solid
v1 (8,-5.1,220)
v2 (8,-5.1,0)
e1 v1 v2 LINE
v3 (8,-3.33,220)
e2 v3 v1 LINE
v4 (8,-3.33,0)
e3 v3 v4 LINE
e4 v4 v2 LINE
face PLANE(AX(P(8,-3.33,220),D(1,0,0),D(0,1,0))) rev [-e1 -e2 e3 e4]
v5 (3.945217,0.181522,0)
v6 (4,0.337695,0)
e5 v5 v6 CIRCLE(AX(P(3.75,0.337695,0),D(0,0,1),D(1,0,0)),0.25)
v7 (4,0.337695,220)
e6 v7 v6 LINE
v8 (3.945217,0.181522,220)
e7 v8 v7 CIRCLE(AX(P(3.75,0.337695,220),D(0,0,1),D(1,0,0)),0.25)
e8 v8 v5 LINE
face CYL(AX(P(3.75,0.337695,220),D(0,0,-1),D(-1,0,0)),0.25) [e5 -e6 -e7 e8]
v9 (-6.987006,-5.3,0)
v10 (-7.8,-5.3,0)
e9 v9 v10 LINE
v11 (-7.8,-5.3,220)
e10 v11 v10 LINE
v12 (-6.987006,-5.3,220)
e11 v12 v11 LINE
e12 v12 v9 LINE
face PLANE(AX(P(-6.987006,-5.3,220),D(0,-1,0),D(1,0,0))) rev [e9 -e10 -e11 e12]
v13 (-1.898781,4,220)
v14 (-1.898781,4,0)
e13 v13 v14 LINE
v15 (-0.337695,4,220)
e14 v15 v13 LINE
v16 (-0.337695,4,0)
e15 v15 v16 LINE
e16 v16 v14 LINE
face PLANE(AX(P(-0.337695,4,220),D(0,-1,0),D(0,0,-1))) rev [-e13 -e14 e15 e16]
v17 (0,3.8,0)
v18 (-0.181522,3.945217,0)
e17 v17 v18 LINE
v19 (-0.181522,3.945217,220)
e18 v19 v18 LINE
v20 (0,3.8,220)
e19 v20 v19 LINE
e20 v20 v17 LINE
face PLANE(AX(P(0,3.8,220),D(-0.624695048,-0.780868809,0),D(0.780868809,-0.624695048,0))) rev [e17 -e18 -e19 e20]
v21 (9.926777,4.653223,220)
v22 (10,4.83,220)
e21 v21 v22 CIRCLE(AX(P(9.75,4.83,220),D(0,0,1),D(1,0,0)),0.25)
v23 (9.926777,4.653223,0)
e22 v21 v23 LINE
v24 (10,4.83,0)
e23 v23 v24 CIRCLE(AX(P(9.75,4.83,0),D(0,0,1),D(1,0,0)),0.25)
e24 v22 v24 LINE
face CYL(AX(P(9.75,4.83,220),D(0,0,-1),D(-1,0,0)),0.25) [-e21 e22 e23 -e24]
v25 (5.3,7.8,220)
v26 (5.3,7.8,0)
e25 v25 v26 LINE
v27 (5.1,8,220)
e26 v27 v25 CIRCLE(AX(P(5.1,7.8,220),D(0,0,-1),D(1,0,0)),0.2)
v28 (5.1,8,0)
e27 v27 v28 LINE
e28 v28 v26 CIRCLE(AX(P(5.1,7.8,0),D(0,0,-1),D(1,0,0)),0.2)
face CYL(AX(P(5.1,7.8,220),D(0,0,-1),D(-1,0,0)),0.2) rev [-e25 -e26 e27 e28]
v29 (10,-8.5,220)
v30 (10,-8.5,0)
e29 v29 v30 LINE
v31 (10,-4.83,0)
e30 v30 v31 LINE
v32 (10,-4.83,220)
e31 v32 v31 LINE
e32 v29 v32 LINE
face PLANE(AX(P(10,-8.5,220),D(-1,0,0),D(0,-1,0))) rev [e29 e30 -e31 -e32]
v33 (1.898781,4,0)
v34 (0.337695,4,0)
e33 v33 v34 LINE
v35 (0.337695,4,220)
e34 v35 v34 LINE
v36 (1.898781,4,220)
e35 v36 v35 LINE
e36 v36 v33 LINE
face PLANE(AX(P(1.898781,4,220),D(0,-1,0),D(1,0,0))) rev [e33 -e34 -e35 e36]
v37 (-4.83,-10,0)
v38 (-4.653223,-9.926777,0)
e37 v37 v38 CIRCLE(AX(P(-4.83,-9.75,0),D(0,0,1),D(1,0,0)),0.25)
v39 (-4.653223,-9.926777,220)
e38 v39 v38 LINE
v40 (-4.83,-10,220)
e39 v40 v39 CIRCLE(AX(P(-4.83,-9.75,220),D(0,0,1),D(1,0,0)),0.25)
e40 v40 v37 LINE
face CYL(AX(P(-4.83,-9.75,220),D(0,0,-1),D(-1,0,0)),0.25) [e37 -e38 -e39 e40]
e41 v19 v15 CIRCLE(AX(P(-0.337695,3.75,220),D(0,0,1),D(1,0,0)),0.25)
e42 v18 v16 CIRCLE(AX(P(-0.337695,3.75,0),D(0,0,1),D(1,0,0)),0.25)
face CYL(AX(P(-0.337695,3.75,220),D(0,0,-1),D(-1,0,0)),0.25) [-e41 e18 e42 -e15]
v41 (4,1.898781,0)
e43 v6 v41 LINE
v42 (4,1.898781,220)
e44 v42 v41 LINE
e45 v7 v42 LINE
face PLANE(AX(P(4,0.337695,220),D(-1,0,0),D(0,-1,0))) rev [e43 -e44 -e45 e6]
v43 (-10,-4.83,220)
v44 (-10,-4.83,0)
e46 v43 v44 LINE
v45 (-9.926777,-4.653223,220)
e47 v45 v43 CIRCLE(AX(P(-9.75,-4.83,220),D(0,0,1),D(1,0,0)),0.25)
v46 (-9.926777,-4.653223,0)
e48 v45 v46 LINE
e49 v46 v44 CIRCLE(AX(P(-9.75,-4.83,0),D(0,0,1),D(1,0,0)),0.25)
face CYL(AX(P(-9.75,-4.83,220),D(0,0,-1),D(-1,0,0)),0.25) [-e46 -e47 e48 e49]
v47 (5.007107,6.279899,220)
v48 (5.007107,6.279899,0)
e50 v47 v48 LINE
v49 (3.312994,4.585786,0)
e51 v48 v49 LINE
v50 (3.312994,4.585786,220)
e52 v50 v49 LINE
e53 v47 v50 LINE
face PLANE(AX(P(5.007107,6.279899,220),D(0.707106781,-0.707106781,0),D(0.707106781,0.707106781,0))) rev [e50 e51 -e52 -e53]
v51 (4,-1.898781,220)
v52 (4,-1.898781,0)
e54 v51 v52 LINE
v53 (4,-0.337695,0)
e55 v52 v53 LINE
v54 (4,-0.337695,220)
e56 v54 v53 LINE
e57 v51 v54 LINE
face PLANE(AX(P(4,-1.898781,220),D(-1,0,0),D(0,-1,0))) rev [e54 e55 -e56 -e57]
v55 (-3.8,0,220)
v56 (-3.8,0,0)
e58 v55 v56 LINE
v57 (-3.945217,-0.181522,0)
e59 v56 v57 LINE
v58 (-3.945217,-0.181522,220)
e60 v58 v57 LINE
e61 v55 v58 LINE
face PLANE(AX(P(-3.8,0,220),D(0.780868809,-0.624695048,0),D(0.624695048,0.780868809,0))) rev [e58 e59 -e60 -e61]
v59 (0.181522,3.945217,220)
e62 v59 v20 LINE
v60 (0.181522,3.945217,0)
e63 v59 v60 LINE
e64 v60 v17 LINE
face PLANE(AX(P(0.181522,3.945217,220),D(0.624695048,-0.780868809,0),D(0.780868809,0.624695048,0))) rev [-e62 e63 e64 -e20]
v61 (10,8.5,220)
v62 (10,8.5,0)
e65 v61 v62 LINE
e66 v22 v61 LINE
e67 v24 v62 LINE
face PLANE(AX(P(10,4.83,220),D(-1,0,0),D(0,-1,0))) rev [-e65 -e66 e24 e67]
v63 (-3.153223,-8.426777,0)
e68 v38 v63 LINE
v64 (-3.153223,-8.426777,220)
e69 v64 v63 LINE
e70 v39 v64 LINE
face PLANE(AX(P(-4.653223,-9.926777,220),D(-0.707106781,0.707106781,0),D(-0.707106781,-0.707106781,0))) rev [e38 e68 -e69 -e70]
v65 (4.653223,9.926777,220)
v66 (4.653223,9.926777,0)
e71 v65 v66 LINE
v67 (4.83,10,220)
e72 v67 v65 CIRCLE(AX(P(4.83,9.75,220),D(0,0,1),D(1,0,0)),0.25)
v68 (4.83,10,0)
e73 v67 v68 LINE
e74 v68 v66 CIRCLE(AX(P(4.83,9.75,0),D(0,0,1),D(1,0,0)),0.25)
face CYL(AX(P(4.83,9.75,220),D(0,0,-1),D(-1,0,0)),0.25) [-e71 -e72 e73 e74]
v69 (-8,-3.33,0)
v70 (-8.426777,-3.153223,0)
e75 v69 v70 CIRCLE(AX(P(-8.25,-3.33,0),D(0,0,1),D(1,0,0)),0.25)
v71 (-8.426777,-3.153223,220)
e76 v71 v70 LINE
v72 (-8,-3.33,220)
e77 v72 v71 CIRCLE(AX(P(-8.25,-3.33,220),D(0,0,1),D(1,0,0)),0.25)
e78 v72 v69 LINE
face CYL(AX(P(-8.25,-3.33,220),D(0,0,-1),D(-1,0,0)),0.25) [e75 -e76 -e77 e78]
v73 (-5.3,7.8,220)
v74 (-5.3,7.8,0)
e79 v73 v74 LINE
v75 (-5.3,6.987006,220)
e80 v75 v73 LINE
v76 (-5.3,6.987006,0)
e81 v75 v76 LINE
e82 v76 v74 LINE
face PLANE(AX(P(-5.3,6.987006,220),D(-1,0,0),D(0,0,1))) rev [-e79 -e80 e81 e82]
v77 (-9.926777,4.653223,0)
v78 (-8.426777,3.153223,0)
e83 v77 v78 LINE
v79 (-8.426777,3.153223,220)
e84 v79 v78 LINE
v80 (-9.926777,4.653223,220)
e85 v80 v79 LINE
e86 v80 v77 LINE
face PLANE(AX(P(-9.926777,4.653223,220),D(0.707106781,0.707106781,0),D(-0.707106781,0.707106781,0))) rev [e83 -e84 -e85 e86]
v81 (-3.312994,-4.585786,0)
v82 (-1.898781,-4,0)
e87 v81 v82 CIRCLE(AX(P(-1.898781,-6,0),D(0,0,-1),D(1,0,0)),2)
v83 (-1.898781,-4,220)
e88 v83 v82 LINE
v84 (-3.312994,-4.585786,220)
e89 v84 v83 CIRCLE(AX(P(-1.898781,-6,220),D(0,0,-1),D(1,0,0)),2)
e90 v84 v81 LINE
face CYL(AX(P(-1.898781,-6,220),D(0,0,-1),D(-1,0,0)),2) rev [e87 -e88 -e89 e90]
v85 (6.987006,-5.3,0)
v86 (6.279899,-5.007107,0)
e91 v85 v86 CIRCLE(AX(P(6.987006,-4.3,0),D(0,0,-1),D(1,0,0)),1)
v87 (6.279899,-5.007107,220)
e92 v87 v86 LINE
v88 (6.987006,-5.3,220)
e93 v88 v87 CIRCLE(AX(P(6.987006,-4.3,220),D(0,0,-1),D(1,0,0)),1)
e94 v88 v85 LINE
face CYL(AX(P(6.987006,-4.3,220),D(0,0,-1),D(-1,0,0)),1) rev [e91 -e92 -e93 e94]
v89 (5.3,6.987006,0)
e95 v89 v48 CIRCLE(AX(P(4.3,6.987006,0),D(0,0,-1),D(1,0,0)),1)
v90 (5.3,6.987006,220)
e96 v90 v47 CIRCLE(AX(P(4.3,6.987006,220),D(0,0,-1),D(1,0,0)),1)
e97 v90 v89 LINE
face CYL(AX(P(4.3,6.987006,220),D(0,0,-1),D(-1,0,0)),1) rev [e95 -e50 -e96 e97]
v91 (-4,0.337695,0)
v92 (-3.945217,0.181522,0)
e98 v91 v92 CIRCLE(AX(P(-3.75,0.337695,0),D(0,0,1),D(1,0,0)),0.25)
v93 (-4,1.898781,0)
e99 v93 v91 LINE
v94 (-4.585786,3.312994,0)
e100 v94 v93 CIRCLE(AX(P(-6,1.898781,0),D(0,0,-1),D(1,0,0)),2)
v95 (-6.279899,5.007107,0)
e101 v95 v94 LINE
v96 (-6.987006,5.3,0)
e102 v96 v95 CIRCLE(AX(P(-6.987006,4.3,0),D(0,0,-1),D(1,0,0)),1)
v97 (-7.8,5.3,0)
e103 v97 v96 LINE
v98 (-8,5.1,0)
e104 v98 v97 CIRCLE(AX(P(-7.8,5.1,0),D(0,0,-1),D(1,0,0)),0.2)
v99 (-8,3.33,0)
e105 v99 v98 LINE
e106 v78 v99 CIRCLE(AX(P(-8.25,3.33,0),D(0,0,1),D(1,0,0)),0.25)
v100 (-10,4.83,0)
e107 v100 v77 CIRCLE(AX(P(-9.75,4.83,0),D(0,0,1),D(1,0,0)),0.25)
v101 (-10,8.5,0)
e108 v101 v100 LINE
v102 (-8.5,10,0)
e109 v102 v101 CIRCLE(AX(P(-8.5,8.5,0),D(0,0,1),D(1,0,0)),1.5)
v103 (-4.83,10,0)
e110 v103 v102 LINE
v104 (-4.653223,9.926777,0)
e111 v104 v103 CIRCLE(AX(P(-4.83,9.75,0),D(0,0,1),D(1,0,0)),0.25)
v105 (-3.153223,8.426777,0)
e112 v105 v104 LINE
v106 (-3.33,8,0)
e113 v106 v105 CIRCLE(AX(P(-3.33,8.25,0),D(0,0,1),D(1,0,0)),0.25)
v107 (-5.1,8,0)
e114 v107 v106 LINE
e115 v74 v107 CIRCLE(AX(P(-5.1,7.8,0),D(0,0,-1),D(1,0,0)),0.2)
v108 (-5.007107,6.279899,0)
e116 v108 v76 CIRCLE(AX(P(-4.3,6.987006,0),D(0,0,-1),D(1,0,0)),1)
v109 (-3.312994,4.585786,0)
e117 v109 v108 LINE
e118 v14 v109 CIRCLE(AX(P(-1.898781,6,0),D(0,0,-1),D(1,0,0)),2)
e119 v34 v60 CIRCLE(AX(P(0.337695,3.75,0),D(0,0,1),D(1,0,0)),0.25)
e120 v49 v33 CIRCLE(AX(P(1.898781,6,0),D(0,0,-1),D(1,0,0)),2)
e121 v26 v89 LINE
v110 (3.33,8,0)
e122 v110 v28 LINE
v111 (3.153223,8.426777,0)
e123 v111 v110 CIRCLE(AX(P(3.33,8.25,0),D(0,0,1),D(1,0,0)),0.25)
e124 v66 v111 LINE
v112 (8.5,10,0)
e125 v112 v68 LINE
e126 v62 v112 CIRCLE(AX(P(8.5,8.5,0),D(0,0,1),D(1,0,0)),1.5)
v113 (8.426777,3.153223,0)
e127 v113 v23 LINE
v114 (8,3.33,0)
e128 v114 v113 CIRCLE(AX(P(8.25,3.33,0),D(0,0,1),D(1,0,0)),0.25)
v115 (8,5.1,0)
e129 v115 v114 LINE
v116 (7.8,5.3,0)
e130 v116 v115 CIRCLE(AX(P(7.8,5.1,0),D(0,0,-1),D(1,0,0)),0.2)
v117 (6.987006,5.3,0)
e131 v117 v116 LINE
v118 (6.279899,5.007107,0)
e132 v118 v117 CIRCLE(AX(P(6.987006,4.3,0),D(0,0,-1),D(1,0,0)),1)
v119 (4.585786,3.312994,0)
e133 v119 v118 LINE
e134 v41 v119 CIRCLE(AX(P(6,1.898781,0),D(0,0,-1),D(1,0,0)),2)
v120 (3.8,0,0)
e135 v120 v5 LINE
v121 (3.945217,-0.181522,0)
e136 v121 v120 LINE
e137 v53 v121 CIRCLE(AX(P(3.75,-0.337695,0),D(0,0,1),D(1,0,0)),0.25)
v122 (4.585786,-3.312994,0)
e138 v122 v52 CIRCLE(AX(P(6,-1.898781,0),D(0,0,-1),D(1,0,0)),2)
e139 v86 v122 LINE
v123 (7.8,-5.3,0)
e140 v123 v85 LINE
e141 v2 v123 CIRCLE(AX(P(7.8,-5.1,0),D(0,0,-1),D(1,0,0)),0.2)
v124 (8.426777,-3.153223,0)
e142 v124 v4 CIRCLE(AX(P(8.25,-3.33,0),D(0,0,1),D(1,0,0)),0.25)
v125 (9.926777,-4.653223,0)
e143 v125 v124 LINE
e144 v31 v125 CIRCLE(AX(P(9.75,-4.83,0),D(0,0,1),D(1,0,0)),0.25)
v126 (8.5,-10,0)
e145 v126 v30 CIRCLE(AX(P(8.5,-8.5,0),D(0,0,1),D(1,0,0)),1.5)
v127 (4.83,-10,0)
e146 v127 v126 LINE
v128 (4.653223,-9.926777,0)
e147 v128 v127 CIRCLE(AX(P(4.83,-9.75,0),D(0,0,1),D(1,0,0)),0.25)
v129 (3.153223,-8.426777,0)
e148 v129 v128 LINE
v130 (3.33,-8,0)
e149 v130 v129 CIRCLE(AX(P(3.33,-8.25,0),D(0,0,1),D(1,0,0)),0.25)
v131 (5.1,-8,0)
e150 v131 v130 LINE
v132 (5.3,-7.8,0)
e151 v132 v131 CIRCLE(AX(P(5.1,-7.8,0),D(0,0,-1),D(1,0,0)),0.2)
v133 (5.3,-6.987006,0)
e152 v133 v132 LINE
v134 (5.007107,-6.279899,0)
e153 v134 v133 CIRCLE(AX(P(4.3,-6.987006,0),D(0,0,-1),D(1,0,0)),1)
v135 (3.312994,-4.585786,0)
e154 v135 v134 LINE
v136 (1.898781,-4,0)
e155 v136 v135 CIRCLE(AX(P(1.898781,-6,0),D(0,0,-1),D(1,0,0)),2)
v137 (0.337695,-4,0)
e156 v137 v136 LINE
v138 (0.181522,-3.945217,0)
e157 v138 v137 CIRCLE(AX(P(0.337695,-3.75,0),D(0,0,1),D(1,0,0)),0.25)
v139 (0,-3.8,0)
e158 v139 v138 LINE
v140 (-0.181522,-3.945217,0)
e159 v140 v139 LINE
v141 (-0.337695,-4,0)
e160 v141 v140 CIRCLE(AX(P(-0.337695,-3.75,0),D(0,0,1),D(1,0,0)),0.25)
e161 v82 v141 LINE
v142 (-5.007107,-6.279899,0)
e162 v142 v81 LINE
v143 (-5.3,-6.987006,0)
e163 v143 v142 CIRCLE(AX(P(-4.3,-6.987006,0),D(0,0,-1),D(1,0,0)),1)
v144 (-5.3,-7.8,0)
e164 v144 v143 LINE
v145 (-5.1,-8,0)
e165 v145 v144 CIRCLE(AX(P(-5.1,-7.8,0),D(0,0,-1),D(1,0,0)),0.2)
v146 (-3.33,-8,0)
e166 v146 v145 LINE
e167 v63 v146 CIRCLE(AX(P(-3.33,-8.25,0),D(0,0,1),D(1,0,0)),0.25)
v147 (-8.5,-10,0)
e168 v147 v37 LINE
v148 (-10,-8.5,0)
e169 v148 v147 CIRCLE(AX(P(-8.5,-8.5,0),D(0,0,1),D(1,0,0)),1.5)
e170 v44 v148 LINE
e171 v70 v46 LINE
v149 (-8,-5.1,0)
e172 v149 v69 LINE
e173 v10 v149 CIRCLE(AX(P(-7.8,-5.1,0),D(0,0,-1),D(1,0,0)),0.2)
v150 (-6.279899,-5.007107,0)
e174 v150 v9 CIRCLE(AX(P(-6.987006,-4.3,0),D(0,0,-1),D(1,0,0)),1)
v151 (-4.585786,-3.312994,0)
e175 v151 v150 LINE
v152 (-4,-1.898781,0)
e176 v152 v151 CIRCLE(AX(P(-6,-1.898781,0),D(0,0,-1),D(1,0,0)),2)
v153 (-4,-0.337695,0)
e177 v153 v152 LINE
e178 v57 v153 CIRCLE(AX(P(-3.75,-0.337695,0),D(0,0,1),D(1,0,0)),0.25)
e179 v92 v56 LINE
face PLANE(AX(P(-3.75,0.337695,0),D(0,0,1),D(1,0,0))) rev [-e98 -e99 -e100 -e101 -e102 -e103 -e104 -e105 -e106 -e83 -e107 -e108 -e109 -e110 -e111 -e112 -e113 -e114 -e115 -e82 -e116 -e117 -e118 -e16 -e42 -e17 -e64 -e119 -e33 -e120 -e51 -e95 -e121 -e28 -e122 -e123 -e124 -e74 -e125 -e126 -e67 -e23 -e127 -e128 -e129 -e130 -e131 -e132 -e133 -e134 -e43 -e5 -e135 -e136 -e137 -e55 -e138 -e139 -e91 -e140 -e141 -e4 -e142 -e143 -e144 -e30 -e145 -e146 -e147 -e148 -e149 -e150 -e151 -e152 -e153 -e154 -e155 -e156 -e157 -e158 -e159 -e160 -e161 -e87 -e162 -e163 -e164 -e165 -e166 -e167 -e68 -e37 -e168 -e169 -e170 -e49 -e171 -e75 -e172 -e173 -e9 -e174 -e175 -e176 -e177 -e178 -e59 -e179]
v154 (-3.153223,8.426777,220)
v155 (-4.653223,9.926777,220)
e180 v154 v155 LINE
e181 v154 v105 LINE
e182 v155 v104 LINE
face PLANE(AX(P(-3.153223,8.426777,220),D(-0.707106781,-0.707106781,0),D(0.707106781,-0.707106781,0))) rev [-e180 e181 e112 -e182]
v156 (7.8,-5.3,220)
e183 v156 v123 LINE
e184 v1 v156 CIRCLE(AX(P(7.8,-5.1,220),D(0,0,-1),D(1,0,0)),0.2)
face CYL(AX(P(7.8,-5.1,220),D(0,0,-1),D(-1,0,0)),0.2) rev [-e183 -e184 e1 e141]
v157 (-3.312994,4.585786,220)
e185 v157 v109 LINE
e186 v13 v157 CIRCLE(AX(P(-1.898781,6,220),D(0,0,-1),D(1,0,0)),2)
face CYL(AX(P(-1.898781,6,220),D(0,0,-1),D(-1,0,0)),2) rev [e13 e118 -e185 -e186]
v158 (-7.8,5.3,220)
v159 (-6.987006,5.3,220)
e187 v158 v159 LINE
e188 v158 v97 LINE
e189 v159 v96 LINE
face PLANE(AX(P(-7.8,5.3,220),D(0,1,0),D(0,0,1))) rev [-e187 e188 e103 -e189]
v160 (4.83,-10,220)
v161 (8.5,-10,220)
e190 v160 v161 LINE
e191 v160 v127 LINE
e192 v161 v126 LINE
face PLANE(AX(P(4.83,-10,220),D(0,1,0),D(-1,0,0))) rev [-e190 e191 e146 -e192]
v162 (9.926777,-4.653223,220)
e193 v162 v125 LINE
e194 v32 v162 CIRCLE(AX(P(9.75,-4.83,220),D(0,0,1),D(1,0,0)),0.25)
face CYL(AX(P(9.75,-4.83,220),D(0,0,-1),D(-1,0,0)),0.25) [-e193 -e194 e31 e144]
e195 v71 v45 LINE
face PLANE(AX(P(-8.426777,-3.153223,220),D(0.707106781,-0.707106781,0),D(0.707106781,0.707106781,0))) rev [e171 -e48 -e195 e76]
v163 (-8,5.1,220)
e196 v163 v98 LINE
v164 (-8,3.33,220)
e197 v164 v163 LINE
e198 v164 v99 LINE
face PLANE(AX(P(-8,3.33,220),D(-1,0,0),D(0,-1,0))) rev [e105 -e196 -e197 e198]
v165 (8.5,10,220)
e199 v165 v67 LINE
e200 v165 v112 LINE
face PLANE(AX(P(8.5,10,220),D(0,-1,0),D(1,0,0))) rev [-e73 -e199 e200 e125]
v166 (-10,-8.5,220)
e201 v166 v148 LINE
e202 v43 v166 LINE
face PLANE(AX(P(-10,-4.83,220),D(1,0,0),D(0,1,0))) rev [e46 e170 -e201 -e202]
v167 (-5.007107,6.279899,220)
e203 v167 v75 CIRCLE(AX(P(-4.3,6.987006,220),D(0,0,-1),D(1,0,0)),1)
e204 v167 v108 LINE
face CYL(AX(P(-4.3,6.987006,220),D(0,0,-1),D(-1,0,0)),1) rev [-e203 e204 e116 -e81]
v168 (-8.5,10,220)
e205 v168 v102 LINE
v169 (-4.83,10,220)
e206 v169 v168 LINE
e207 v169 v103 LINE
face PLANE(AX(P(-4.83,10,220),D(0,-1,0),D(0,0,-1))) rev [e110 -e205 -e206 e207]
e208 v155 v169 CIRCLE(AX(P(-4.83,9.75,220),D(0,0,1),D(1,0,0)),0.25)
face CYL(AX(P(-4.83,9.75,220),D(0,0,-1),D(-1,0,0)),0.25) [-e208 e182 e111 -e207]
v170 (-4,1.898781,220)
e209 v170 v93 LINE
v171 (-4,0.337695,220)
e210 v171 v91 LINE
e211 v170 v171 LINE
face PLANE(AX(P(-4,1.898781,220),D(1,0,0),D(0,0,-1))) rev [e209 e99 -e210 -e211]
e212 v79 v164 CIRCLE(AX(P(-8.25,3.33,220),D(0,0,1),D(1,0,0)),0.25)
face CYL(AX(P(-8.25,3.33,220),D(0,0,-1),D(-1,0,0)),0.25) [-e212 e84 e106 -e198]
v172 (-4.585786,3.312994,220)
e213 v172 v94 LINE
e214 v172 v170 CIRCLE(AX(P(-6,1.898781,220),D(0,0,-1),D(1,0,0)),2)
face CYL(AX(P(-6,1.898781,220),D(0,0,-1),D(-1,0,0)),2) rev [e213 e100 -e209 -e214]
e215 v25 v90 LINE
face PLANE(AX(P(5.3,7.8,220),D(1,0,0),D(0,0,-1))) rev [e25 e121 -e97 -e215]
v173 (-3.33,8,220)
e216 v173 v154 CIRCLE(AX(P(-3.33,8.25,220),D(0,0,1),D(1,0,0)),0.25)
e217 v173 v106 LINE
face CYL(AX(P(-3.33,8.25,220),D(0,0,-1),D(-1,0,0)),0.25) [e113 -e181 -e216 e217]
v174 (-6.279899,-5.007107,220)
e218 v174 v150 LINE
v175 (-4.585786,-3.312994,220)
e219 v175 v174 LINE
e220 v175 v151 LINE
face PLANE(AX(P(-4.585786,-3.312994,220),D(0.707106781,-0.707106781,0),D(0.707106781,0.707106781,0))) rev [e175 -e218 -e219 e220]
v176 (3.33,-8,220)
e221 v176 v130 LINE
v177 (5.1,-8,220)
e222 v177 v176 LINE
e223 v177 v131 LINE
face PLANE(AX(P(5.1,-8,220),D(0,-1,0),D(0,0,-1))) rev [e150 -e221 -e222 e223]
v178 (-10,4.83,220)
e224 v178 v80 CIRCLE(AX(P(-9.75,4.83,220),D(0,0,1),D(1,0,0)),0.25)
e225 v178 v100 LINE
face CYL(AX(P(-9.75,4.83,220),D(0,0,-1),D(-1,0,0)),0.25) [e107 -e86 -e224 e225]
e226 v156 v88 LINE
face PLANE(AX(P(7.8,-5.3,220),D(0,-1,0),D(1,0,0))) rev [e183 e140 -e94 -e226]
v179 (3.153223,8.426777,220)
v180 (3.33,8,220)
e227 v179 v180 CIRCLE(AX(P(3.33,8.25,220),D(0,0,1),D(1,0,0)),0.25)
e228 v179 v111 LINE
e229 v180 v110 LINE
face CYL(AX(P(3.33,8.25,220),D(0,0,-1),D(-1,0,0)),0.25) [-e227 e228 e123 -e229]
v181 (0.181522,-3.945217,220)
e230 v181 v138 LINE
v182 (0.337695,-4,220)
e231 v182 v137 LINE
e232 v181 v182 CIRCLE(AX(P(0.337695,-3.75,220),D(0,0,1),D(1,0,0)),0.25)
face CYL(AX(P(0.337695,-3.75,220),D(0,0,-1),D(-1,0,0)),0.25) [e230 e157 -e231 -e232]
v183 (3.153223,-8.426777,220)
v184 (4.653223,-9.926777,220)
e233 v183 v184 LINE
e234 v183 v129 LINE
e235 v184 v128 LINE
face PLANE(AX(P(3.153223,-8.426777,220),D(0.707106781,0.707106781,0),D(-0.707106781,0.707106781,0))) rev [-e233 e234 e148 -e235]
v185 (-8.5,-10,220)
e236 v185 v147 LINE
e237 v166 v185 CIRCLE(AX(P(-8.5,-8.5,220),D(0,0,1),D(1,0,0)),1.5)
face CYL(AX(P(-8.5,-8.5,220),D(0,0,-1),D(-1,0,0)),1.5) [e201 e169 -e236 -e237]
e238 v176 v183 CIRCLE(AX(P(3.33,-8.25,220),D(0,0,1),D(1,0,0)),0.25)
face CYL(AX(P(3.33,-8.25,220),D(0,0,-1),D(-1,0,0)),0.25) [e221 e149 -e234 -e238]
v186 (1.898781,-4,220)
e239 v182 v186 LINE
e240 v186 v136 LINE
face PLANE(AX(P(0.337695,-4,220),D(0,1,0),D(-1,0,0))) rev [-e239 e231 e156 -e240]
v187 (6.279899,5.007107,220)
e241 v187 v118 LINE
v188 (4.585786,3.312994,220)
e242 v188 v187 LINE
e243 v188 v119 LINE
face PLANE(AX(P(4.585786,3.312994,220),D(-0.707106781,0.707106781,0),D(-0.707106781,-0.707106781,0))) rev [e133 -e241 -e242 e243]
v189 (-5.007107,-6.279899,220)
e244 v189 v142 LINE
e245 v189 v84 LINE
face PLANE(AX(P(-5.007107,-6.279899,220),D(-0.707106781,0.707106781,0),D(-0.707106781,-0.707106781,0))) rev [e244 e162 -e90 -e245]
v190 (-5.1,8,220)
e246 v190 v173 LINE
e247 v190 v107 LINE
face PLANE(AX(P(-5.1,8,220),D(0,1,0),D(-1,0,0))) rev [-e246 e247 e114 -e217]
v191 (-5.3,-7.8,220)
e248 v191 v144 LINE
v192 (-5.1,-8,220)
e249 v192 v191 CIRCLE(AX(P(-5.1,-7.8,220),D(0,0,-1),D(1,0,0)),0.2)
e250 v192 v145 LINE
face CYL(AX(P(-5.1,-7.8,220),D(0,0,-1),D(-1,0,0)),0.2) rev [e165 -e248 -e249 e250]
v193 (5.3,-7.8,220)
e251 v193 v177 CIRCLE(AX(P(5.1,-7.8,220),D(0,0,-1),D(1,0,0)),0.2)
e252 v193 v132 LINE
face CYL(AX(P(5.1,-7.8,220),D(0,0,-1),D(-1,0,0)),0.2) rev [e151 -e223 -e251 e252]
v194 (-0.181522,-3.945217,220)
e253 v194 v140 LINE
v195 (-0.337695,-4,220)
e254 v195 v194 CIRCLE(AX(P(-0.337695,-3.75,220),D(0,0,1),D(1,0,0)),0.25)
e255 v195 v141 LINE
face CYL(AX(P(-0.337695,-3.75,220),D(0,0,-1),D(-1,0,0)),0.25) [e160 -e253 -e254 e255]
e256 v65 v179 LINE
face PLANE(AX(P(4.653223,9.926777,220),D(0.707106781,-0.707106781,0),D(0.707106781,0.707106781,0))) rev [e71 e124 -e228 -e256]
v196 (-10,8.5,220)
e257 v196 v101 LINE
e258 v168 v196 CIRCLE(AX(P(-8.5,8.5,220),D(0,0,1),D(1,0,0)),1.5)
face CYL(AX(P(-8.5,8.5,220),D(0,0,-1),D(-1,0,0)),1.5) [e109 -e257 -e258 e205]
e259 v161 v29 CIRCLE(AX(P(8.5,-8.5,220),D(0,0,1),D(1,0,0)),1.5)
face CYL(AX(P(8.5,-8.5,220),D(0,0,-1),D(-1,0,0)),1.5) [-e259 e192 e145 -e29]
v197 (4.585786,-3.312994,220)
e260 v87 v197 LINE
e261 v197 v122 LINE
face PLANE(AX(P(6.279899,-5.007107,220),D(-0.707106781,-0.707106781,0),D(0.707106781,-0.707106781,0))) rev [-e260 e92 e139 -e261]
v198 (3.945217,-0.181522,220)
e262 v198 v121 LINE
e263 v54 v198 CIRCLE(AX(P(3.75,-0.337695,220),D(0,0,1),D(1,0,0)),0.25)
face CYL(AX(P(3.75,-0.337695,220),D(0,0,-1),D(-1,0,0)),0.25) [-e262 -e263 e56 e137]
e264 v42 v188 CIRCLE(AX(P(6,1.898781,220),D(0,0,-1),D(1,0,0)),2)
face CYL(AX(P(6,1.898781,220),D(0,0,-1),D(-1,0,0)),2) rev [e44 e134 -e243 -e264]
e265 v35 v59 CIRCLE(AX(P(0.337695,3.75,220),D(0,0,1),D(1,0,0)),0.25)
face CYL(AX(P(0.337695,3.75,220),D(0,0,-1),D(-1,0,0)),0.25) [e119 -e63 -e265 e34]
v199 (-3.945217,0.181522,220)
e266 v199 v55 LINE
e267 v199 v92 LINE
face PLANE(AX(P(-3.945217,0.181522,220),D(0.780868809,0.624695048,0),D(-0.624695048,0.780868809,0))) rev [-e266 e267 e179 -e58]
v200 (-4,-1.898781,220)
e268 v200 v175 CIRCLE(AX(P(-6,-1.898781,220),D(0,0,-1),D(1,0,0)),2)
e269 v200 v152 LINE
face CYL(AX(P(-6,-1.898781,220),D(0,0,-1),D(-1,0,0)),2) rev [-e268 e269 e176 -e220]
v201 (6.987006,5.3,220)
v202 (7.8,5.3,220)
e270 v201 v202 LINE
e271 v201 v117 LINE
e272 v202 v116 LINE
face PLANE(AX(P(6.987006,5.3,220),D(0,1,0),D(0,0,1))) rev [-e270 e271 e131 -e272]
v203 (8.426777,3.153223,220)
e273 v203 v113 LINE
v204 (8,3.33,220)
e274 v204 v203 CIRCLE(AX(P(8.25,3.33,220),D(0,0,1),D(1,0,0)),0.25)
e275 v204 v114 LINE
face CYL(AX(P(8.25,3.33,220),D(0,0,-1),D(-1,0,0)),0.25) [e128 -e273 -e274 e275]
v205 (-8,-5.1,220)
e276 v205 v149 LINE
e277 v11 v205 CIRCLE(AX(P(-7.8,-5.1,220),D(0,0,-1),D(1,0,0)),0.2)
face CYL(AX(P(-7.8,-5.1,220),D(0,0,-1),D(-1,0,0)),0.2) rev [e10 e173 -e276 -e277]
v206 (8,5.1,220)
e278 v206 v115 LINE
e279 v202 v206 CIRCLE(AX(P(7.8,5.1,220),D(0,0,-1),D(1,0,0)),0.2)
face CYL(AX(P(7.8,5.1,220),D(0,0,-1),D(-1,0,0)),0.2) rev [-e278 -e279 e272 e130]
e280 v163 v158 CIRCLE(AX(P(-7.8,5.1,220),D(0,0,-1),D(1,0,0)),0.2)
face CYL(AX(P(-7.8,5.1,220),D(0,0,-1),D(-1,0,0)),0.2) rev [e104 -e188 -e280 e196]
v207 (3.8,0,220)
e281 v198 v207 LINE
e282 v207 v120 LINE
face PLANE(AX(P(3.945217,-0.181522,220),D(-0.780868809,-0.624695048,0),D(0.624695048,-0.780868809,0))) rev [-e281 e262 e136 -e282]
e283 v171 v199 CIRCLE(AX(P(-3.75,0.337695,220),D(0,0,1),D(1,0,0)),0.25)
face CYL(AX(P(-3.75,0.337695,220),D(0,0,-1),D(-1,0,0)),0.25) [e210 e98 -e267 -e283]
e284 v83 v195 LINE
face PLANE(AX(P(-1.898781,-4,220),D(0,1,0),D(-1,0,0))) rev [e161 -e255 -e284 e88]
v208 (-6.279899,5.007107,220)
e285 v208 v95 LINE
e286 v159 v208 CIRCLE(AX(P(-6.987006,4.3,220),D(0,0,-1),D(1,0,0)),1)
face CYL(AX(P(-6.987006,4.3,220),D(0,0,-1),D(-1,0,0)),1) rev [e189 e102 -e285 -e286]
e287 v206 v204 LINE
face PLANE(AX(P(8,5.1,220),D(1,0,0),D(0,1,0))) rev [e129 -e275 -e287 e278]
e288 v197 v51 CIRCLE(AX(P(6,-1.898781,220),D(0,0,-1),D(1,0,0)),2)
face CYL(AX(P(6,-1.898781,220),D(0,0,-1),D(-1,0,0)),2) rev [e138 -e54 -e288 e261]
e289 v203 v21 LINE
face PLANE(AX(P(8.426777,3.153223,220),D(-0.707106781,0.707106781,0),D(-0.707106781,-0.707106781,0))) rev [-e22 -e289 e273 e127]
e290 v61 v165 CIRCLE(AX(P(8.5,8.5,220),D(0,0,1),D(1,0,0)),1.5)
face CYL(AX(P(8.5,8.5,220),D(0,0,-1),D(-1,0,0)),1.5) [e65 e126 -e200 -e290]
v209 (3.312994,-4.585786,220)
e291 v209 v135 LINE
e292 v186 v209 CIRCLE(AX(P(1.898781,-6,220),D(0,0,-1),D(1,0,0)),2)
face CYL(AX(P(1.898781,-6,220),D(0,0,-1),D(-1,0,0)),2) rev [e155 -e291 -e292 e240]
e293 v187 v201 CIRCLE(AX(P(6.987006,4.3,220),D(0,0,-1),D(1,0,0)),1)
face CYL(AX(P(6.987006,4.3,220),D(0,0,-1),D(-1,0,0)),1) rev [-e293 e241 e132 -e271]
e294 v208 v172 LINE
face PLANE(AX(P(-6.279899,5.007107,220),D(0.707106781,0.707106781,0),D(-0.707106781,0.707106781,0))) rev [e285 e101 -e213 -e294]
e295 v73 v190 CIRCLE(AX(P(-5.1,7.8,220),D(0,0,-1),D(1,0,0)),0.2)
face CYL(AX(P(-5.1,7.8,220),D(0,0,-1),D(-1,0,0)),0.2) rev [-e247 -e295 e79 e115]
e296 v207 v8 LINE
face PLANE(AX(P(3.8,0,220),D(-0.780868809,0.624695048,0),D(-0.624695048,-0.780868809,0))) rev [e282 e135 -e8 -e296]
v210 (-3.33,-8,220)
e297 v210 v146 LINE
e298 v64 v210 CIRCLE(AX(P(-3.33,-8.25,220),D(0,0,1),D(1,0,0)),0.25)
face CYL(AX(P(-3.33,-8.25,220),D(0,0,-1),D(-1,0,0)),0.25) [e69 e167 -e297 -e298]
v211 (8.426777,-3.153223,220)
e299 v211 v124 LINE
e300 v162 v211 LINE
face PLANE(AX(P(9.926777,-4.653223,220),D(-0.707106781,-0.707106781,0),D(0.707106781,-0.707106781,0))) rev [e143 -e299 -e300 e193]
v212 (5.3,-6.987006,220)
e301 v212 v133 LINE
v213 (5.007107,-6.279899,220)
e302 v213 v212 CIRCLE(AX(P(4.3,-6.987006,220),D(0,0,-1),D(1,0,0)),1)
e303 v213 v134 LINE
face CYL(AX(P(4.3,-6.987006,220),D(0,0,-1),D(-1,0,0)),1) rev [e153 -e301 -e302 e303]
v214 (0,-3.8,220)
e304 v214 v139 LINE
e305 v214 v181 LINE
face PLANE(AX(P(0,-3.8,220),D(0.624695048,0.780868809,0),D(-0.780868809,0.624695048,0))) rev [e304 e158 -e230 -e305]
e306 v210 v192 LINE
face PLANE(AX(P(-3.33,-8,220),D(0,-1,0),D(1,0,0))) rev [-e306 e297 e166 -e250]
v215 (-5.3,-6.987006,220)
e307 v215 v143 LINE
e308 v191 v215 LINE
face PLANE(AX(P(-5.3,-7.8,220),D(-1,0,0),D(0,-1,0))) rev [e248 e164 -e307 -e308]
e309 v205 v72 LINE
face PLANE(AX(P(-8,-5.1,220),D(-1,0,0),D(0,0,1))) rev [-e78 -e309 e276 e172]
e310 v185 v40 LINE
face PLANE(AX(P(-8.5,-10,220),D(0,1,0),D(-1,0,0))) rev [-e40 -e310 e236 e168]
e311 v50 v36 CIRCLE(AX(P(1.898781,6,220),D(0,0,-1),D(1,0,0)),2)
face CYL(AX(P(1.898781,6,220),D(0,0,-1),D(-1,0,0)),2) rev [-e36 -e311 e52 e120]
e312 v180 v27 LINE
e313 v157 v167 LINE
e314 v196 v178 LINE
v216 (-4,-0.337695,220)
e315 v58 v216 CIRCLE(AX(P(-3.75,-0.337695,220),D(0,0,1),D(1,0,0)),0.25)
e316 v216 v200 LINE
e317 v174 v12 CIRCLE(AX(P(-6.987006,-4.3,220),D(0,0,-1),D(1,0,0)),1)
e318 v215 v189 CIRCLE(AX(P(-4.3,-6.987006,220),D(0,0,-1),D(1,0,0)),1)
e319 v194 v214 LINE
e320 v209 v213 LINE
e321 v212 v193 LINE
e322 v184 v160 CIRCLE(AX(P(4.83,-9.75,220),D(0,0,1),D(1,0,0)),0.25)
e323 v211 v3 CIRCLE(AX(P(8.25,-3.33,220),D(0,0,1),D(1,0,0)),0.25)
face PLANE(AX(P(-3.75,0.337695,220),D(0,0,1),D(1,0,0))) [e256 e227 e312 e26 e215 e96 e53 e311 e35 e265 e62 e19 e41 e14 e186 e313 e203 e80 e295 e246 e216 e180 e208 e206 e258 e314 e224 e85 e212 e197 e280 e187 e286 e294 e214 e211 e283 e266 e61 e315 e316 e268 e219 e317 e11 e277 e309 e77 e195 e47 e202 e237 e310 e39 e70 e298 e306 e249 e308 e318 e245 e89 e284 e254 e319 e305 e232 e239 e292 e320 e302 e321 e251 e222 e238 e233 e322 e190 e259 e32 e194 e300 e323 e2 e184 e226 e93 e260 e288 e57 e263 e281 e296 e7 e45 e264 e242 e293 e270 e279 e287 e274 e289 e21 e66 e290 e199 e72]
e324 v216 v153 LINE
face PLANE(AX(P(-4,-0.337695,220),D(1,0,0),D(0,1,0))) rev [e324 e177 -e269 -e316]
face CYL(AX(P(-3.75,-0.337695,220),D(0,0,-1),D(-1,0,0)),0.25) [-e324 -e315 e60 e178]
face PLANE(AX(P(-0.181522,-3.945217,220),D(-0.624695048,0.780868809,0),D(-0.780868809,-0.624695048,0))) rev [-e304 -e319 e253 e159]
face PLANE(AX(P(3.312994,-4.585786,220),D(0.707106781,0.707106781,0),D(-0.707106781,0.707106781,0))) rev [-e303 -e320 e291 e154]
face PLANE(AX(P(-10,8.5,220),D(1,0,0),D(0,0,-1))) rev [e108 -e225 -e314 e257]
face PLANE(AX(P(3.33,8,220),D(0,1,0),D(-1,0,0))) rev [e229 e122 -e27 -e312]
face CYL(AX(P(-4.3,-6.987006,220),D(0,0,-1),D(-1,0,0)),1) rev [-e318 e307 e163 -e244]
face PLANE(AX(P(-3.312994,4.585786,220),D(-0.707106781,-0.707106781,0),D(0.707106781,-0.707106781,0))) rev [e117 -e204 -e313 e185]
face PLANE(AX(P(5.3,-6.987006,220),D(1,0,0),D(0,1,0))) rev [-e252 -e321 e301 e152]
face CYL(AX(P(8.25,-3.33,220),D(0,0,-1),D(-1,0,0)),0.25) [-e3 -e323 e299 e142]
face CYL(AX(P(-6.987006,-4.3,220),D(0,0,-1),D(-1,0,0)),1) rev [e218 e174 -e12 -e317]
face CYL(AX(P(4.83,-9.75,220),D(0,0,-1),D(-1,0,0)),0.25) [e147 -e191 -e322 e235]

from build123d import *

# Parameters (mm, degrees)
EXTRUDE_1_DEPTH = 220


# Read off the part's stored shape, not the designer's step: 222 Конструкционный профиль 20х20-1-surface1
with BuildPart() as part:
    # Эскиз1 → Бобышка-Вытянуть1 (new body)
    with BuildSketch(Plane.XY):
        with BuildLine():
            Line((-3.945217202, 0.181521503), (-3.8, 0))
            Line((-3.8, 0), (-3.945217202, -0.181521503))
            ThreePointArc((-3.945217202, -0.181521503), (-3.98590708, -0.254943529), (-4, -0.337695265))
            Line((-4, -0.337695265), (-4, -1.898780669))
            ThreePointArc((-4, -1.898780669), (-4.152240935, -2.664147534), (-4.585786438, -3.312994231))
            Line((-4.585786438, -3.312994231), (-6.279898987, -5.007106781))
            ThreePointArc((-6.279898987, -5.007106781), (-6.604322336, -5.223879533), (-6.987005769, -5.3))
            Line((-6.987005769, -5.3), (-7.8, -5.3))
            ThreePointArc((-7.8, -5.3), (-7.941421356, -5.241421356), (-8, -5.1))
            Line((-8, -5.1), (-8, -3.33))
            ThreePointArc((-8, -3.33), (-8.154329142, -3.099030117), (-8.426776695, -3.153223305))
            Line((-8.426776695, -3.153223305), (-9.926776695, -4.653223305))
            ThreePointArc((-9.926776695, -4.653223305), (-9.980969883, -4.734329142), (-10, -4.83))
            Line((-10, -4.83), (-10, -8.5))
            ThreePointArc((-10, -8.5), (-9.560660172, -9.560660172), (-8.5, -10))
            Line((-8.5, -10), (-4.83, -10))
            ThreePointArc((-4.83, -10), (-4.734329142, -9.980969883), (-4.653223305, -9.926776695))
            Line((-4.653223305, -9.926776695), (-3.153223305, -8.426776695))
            ThreePointArc((-3.153223305, -8.426776695), (-3.099030117, -8.154329142), (-3.33, -8))
            Line((-3.33, -8), (-5.1, -8))
            ThreePointArc((-5.1, -8), (-5.241421356, -7.941421356), (-5.3, -7.8))
            Line((-5.3, -7.8), (-5.3, -6.987005769))
            ThreePointArc((-5.3, -6.987005769), (-5.223879533, -6.604322336), (-5.007106781, -6.279898987))
            Line((-5.007106781, -6.279898987), (-3.312994231, -4.585786438))
            ThreePointArc((-3.312994231, -4.585786438), (-2.664147534, -4.152240935), (-1.898780669, -4))
            Line((-1.898780669, -4), (-0.337695265, -4))
            ThreePointArc((-0.337695265, -4), (-0.254943529, -3.98590708), (-0.181521503, -3.945217202))
            Line((-0.181521503, -3.945217202), (0, -3.8))
            Line((0, -3.8), (0.181521503, -3.945217202))
            ThreePointArc((0.181521503, -3.945217202), (0.254943529, -3.98590708), (0.337695265, -4))
            Line((0.337695265, -4), (1.898780669, -4))
            ThreePointArc((1.898780669, -4), (2.664147534, -4.152240935), (3.312994231, -4.585786438))
            Line((3.312994231, -4.585786438), (5.007106781, -6.279898987))
            ThreePointArc((5.007106781, -6.279898987), (5.223879533, -6.604322336), (5.3, -6.987005769))
            Line((5.3, -6.987005769), (5.3, -7.8))
            ThreePointArc((5.3, -7.8), (5.241421356, -7.941421356), (5.1, -8))
            Line((5.1, -8), (3.33, -8))
            ThreePointArc((3.33, -8), (3.099030117, -8.154329142), (3.153223305, -8.426776695))
            Line((3.153223305, -8.426776695), (4.653223305, -9.926776695))
            ThreePointArc((4.653223305, -9.926776695), (4.734329142, -9.980969883), (4.83, -10))
            Line((4.83, -10), (8.5, -10))
            ThreePointArc((8.5, -10), (9.560660172, -9.560660172), (10, -8.5))
            Line((10, -8.5), (10, -4.83))
            ThreePointArc((10, -4.83), (9.980969883, -4.734329142), (9.926776695, -4.653223305))
            Line((9.926776695, -4.653223305), (8.426776695, -3.153223305))
            ThreePointArc((8.426776695, -3.153223305), (8.154329142, -3.099030117), (8, -3.33))
            Line((8, -3.33), (8, -5.1))
            ThreePointArc((8, -5.1), (7.941421356, -5.241421356), (7.8, -5.3))
            Line((7.8, -5.3), (6.987005769, -5.3))
            ThreePointArc((6.987005769, -5.3), (6.604322336, -5.223879533), (6.279898987, -5.007106781))
            Line((6.279898987, -5.007106781), (4.585786438, -3.312994231))
            ThreePointArc((4.585786438, -3.312994231), (4.152240935, -2.664147534), (4, -1.898780669))
            Line((4, -1.898780669), (4, -0.337695265))
            ThreePointArc((4, -0.337695265), (3.98590708, -0.254943529), (3.945217202, -0.181521503))
            Line((3.945217202, -0.181521503), (3.8, 0))
            Line((3.8, 0), (3.945217202, 0.181521503))
            ThreePointArc((3.945217202, 0.181521503), (3.98590708, 0.254943529), (4, 0.337695265))
            Line((4, 0.337695265), (4, 1.898780669))
            ThreePointArc((4, 1.898780669), (4.152240935, 2.664147534), (4.585786438, 3.312994231))
            Line((4.585786438, 3.312994231), (6.279898987, 5.007106781))
            ThreePointArc((6.279898987, 5.007106781), (6.604322336, 5.223879533), (6.987005769, 5.3))
            Line((6.987005769, 5.3), (7.8, 5.3))
            ThreePointArc((7.8, 5.3), (7.941421356, 5.241421356), (8, 5.1))
            Line((8, 5.1), (8, 3.33))
            ThreePointArc((8, 3.33), (8.154329142, 3.099030117), (8.426776695, 3.153223305))
            Line((8.426776695, 3.153223305), (9.926776695, 4.653223305))
            ThreePointArc((9.926776695, 4.653223305), (9.980969883, 4.734329142), (10, 4.83))
            Line((10, 4.83), (10, 8.5))
            ThreePointArc((10, 8.5), (9.560660172, 9.560660172), (8.5, 10))
            Line((8.5, 10), (4.83, 10))
            ThreePointArc((4.83, 10), (4.734329142, 9.980969883), (4.653223305, 9.926776695))
            Line((4.653223305, 9.926776695), (3.153223305, 8.426776695))
            ThreePointArc((3.153223305, 8.426776695), (3.099030117, 8.154329142), (3.33, 8))
            Line((3.33, 8), (5.1, 8))
            ThreePointArc((5.1, 8), (5.241421356, 7.941421356), (5.3, 7.8))
            Line((5.3, 7.8), (5.3, 6.987005769))
            ThreePointArc((5.3, 6.987005769), (5.223879533, 6.604322336), (5.007106781, 6.279898987))
            Line((5.007106781, 6.279898987), (3.312994231, 4.585786438))
            ThreePointArc((3.312994231, 4.585786438), (2.664147534, 4.152240935), (1.898780669, 4))
            Line((1.898780669, 4), (0.337695265, 4))
            ThreePointArc((0.337695265, 4), (0.254943529, 3.98590708), (0.181521503, 3.945217202))
            Line((0.181521503, 3.945217202), (0, 3.8))
            Line((0, 3.8), (-0.181521503, 3.945217202))
            ThreePointArc((-0.181521503, 3.945217202), (-0.254943529, 3.98590708), (-0.337695265, 4))
            Line((-0.337695265, 4), (-1.898780669, 4))
            ThreePointArc((-1.898780669, 4), (-2.664147534, 4.152240935), (-3.312994231, 4.585786438))
            Line((-3.312994231, 4.585786438), (-5.007106781, 6.279898987))
            ThreePointArc((-5.007106781, 6.279898987), (-5.223879533, 6.604322336), (-5.3, 6.987005769))
            Line((-5.3, 6.987005769), (-5.3, 7.8))
            ThreePointArc((-5.3, 7.8), (-5.241421356, 7.941421356), (-5.1, 8))
            Line((-5.1, 8), (-3.33, 8))
            ThreePointArc((-3.33, 8), (-3.099030117, 8.154329142), (-3.153223305, 8.426776695))
            Line((-3.153223305, 8.426776695), (-4.653223305, 9.926776695))
            ThreePointArc((-4.653223305, 9.926776695), (-4.734329142, 9.980969883), (-4.83, 10))
            Line((-4.83, 10), (-8.5, 10))
            ThreePointArc((-8.5, 10), (-9.560660172, 9.560660172), (-10, 8.5))
            Line((-10, 8.5), (-10, 4.83))
            ThreePointArc((-10, 4.83), (-9.980969883, 4.734329142), (-9.926776695, 4.653223305))
            Line((-9.926776695, 4.653223305), (-8.426776695, 3.153223305))
            ThreePointArc((-8.426776695, 3.153223305), (-8.154329142, 3.099030117), (-8, 3.33))
            Line((-8, 3.33), (-8, 5.1))
            ThreePointArc((-8, 5.1), (-7.941421356, 5.241421356), (-7.8, 5.3))
            Line((-7.8, 5.3), (-6.987005769, 5.3))
            ThreePointArc((-6.987005769, 5.3), (-6.604322336, 5.223879533), (-6.279898987, 5.007106781))
            Line((-6.279898987, 5.007106781), (-4.585786438, 3.312994231))
            ThreePointArc((-4.585786438, 3.312994231), (-4.152240935, 2.664147534), (-4, 1.898780669))
            Line((-4, 1.898780669), (-4, 0.337695265))
            ThreePointArc((-4, 0.337695265), (-3.98590708, 0.254943529), (-3.945217202, 0.181521503))
        make_face()
    extrude(amount=EXTRUDE_1_DEPTH)


solid = part.part
